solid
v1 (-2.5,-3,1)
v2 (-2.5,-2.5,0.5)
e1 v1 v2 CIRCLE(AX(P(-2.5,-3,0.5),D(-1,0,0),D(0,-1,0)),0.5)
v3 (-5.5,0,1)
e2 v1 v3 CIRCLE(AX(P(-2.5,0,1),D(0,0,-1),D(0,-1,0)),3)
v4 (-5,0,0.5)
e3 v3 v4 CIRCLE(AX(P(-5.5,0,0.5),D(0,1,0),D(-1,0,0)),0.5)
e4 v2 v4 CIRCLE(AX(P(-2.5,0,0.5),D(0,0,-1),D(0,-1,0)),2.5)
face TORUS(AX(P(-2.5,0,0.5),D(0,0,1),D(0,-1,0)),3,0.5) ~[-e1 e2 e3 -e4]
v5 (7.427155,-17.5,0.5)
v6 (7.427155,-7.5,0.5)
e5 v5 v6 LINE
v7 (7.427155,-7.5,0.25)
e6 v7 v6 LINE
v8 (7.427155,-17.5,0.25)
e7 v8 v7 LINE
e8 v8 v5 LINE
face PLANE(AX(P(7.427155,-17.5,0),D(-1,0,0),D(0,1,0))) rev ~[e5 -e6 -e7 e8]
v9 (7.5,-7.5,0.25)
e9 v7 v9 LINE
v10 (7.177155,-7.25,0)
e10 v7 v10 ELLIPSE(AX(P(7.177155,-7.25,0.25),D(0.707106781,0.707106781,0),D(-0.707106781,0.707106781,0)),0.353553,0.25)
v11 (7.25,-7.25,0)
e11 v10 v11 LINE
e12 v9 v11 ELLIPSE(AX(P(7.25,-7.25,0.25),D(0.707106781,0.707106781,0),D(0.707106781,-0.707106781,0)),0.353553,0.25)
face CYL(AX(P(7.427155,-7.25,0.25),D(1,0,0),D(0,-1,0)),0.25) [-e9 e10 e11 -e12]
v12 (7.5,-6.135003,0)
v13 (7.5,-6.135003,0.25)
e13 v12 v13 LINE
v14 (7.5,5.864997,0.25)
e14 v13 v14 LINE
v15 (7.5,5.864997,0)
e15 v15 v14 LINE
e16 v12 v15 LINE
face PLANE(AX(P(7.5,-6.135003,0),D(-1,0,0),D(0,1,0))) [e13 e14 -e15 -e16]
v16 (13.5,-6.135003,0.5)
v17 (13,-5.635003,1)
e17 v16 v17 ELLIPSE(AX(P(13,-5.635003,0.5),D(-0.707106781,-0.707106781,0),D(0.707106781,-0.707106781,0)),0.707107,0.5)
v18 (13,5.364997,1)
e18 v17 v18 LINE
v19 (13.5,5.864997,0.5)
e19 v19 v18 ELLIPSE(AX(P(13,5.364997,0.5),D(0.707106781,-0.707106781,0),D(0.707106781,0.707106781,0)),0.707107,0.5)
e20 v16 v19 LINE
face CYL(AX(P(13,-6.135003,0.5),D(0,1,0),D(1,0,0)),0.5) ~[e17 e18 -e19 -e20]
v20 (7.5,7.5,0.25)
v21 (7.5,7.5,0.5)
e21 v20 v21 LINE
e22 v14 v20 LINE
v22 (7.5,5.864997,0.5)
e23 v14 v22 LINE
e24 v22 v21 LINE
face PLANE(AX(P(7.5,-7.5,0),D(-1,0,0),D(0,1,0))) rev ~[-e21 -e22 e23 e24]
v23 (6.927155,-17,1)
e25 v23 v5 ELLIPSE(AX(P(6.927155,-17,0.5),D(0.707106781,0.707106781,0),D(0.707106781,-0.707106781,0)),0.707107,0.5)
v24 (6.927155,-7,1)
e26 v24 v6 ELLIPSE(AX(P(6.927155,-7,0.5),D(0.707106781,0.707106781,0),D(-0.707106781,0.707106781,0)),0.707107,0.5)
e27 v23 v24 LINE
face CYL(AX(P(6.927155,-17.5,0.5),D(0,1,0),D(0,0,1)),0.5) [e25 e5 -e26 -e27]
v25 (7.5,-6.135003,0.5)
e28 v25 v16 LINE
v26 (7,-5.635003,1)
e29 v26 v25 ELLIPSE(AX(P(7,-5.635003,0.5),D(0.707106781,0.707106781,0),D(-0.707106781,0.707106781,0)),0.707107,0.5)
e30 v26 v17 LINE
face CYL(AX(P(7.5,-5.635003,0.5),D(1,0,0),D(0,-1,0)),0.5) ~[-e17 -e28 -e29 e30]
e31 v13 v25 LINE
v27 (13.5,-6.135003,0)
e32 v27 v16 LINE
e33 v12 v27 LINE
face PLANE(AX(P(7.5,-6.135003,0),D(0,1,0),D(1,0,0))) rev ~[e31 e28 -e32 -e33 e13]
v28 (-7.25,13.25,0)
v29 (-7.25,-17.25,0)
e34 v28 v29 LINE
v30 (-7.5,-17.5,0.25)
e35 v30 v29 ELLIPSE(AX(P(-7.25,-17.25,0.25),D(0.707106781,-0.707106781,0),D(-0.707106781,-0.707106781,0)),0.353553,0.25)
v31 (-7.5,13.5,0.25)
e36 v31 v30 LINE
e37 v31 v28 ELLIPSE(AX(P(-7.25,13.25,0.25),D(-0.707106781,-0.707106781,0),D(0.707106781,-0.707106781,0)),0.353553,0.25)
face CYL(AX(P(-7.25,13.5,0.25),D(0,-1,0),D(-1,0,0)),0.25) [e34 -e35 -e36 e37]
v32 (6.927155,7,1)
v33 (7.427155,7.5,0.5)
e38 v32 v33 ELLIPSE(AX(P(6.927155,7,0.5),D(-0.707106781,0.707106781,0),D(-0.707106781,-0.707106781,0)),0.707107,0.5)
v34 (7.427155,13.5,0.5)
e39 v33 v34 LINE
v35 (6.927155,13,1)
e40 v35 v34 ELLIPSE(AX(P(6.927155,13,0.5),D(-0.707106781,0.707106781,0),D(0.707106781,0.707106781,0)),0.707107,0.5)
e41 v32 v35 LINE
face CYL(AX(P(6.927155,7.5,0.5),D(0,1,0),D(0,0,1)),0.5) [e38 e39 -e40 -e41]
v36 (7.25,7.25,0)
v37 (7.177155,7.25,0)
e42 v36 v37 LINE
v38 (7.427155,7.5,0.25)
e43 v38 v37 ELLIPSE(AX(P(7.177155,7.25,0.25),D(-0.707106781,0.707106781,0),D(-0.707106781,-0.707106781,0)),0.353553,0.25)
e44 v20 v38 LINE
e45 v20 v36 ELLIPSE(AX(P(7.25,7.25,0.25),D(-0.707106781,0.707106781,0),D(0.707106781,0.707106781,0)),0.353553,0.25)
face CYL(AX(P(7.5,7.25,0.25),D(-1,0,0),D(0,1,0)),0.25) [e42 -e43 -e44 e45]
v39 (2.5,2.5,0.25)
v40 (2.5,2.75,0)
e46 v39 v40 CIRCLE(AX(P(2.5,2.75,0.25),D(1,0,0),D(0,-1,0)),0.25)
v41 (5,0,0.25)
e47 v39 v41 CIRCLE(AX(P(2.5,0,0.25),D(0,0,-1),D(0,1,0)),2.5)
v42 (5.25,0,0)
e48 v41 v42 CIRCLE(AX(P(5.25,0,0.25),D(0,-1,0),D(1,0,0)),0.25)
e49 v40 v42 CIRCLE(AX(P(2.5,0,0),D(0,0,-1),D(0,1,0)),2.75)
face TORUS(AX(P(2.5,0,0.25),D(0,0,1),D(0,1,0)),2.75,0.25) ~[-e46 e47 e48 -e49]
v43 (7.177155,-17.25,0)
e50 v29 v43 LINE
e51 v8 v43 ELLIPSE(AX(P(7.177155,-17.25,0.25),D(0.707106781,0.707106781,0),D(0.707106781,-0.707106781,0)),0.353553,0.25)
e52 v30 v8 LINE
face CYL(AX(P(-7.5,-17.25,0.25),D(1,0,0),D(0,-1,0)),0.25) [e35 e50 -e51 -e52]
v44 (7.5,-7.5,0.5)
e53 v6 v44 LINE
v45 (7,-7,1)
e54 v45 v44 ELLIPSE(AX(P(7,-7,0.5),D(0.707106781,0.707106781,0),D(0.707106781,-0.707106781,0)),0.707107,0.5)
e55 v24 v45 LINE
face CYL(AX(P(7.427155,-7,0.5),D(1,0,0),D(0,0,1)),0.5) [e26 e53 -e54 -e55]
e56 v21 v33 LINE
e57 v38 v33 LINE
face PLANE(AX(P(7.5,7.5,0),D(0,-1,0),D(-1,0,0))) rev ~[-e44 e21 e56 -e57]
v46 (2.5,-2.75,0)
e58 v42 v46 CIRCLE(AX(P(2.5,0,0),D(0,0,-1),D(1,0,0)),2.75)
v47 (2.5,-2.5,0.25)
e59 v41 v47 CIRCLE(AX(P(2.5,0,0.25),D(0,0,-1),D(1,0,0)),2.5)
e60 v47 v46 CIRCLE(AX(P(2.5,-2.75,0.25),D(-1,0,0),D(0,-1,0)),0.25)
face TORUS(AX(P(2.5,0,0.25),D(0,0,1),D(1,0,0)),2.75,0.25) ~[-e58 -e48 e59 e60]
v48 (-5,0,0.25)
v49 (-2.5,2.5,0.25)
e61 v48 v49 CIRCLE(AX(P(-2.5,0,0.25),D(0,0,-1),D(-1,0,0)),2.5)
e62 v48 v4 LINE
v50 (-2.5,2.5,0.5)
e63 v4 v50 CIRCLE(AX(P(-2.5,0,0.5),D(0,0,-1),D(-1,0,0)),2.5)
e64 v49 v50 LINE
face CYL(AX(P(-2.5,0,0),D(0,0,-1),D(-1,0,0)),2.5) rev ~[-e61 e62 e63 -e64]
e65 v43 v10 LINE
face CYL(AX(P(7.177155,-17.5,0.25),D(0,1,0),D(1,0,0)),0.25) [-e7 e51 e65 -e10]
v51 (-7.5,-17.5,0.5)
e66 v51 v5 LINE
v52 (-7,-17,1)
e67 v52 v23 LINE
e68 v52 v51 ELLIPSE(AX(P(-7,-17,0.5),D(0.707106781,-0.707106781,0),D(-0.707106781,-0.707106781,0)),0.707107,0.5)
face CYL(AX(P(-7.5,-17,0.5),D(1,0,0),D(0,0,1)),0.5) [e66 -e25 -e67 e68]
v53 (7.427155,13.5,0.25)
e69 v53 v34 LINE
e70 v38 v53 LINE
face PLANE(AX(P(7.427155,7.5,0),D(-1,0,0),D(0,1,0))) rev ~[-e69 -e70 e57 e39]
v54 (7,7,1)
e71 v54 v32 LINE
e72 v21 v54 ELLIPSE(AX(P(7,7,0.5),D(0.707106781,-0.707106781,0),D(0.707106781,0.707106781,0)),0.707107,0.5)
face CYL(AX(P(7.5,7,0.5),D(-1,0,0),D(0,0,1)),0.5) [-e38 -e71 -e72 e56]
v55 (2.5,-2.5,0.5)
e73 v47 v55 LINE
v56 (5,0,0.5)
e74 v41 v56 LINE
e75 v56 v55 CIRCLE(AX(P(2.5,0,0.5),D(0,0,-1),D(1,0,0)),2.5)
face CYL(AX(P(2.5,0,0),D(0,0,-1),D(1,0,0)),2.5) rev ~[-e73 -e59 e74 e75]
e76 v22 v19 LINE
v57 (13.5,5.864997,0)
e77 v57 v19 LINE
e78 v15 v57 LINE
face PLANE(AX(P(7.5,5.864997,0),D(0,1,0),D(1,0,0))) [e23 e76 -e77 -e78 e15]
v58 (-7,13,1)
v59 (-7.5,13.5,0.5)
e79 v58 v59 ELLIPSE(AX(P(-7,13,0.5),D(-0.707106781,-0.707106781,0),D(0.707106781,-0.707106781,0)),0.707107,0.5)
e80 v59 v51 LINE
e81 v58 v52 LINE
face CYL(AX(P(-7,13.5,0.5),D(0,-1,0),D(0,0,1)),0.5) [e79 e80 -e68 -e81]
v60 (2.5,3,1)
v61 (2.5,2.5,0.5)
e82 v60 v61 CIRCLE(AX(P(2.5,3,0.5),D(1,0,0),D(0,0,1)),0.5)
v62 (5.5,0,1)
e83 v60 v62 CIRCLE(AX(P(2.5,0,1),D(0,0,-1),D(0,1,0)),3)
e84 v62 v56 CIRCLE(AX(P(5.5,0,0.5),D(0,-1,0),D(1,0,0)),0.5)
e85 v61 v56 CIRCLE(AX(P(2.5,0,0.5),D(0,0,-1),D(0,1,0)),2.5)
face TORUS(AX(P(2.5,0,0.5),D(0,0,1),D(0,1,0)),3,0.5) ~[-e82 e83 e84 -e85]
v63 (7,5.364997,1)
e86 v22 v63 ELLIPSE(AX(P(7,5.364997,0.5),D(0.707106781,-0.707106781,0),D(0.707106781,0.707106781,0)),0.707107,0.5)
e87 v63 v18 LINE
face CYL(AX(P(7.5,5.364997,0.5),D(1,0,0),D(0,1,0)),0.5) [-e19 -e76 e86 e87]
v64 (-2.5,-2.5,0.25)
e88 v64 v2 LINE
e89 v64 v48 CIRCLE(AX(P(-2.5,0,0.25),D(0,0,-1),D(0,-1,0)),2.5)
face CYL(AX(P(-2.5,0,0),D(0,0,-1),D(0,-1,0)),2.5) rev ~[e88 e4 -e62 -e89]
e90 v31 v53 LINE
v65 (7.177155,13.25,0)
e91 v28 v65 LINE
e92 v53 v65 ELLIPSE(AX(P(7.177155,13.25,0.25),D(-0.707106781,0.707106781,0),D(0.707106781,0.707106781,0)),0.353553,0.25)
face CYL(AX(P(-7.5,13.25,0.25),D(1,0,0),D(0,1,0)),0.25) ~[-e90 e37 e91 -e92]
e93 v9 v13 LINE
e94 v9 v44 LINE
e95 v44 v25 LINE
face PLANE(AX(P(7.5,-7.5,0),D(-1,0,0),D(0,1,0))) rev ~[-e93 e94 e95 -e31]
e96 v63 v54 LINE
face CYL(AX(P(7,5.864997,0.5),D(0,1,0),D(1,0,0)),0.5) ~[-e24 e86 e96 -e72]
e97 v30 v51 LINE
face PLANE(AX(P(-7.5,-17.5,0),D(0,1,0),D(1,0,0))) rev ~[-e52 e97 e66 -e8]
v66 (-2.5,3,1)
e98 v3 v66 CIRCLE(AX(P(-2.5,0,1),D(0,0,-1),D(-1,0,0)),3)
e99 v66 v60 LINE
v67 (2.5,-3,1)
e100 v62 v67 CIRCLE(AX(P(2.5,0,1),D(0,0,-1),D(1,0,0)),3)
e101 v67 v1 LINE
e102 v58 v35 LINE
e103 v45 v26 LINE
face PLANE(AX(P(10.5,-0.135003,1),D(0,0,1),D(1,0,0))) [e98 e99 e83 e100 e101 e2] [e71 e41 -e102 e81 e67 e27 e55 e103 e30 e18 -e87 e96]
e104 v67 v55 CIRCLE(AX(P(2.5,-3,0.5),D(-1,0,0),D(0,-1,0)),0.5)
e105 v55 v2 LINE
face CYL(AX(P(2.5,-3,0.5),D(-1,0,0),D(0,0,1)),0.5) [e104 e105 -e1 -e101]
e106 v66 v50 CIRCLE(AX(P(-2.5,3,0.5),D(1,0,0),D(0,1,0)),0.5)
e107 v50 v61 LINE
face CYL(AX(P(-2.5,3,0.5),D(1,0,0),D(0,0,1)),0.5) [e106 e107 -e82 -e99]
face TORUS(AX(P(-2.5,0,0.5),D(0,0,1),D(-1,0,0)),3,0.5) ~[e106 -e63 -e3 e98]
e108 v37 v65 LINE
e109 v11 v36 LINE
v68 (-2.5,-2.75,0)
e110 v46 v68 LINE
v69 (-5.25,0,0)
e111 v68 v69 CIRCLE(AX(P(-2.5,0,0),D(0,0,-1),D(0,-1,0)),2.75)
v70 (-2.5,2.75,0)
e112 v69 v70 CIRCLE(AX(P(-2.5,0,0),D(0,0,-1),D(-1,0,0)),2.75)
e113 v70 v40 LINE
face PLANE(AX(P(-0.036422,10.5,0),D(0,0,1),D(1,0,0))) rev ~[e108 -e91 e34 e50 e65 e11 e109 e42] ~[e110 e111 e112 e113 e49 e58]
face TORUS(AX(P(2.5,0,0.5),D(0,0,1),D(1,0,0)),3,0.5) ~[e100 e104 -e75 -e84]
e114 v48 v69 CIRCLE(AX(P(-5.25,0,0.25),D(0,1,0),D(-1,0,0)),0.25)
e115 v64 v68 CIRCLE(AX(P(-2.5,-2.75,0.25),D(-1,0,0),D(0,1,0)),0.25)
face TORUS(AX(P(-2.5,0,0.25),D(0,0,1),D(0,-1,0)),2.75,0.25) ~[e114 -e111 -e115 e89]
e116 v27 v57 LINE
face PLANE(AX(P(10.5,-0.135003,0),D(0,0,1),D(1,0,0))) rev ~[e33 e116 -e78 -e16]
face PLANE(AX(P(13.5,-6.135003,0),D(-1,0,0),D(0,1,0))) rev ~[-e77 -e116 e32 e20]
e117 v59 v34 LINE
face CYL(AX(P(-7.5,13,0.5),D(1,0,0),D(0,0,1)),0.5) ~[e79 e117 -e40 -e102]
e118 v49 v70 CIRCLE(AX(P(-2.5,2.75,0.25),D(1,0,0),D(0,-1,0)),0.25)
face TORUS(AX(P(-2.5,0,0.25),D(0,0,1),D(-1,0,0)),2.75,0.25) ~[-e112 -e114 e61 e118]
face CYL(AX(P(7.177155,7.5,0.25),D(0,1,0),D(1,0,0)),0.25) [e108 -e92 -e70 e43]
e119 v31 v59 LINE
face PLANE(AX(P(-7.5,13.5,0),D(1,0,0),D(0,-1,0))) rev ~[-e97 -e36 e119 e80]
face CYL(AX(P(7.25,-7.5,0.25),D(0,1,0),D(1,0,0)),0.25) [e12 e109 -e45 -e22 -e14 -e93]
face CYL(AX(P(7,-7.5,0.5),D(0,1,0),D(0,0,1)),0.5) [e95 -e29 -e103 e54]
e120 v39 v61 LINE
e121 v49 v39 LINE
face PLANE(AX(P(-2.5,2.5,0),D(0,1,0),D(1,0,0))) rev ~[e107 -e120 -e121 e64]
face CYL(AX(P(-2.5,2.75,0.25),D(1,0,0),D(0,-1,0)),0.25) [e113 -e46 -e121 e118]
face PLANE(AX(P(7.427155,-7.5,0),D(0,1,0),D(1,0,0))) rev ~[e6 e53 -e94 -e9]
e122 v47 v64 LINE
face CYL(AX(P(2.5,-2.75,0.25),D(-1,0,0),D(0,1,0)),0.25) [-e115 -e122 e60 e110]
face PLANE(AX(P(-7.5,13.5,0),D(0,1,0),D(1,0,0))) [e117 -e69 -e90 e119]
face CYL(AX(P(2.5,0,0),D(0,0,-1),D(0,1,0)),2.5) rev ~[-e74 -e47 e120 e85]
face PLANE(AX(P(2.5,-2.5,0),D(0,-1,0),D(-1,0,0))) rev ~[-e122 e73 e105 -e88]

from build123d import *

# Parameters (mm, degrees)
F0_W     = 14.9271550402
F0_H     = 6
F0_H_2   = 10
F1_DEPTH = 1
F2_R     = 0.25
F3_DEPTH = 1
F0_W_2   = 6
F0_H_3   = 12
F4_DEPTH = 1
F5_R     = 0.5


# Not quite as in the source:
# - a feature names something its author has since deleted; it is built from what else it names


with BuildPart() as f1:
    # F0 (on Top) → F1 (new body)
    with BuildSketch(Plane.XY):
        with Locations((-0.0364224799, 10.5)):
            Rectangle(F0_W, F0_H)
        Polygon((7.4271550402, 7.5), (-7.5, 7.5), (-7.5, -7.5), (7.4271550402, -7.5), (7.5, -7.5), (7.5, -6.1350027099), (7.5, 5.8649972901), (7.5, 7.5), align=None)
        with BuildLine():
            ThreePointArc((-5, 0), (-4.267766953, 1.767766953), (-2.5, 2.5))
            Line((-2.5, 2.5), (2.5, 2.5))
            ThreePointArc((2.5, 2.5), (4.267766953, 1.767766953), (5, 0))
            ThreePointArc((5, 0), (4.267766953, -1.767766953), (2.5, -2.5))
            Line((2.5, -2.5), (-2.5, -2.5))
            ThreePointArc((-2.5, -2.5), (-4.267766953, -1.767766953), (-5, 0))
        make_face(mode=Mode.SUBTRACT)
        with Locations((-0.0364224799, -12.5)):
            Rectangle(F0_W, F0_H_2)
    extrude(amount=F1_DEPTH)

    # F2
    f2_edges = [f1.edges().sort_by_distance(p)[0] for p in [
        (-0.036422, 13.5, 0),
        (-7.5, -2, 0),
        (-0.036422, -17.5, 0),
        (7.427155, -12.5, 0),
        (7.463578, -7.5, 0),
        (7.5, 0, 0),
        (7.463578, 7.5, 0),
        (7.427155, 10.5, 0),
        (-5, 0, 0),
        (0, 2.5, 0),
        (5, 0, 0),
        (0, -2.5, 0),
    ]]
    fillet(f2_edges, radius=F2_R)

    # F0 (on Top) → F3 (cut)
    with BuildSketch(Plane.XY):
        with BuildLine():
            Line((2.5, 2.5), (-2.5, 2.5))
            ThreePointArc((-2.5, 2.5), (-4.267766953, 1.767766953), (-5, 0))
            ThreePointArc((-5, 0), (-4.267766953, -1.767766953), (-2.5, -2.5))
            Line((-2.5, -2.5), (2.5, -2.5))
            ThreePointArc((2.5, -2.5), (4.267766953, -1.767766953), (5, 0))
            ThreePointArc((5, 0), (4.267766953, 1.767766953), (2.5, 2.5))
        make_face()
    extrude(amount=F3_DEPTH, mode=Mode.SUBTRACT)

    # F0 (on Top) → F4 (join)
    with BuildSketch(Plane.XY):
        with Locations((10.5, -0.1350027099)):
            Rectangle(F0_W_2, F0_H_3)
    extrude(amount=F4_DEPTH)

    # F5
    f5_edges = [f1.edges().sort_by_distance(p)[0] for p in [
        (-0.036422, 13.5, 1),
        (-7.5, -2, 1),
        (-0.036422, -17.5, 1),
        (7.427155, -12.5, 1),
        (7.463578, -7.5, 1),
        (7.5, -6.817501, 1),
        (10.5, -6.135003, 1),
        (13.5, -0.135003, 1),
        (10.5, 5.864997, 1),
        (7.5, 6.682499, 1),
        (7.463578, 7.5, 1),
        (7.427155, 10.5, 1),
        (-5, 0, 1),
        (0, 2.5, 1),
        (5, 0, 1),
        (0, -2.5, 1),
    ]]
    fillet(f5_edges, radius=F5_R)


solid = f1.part
